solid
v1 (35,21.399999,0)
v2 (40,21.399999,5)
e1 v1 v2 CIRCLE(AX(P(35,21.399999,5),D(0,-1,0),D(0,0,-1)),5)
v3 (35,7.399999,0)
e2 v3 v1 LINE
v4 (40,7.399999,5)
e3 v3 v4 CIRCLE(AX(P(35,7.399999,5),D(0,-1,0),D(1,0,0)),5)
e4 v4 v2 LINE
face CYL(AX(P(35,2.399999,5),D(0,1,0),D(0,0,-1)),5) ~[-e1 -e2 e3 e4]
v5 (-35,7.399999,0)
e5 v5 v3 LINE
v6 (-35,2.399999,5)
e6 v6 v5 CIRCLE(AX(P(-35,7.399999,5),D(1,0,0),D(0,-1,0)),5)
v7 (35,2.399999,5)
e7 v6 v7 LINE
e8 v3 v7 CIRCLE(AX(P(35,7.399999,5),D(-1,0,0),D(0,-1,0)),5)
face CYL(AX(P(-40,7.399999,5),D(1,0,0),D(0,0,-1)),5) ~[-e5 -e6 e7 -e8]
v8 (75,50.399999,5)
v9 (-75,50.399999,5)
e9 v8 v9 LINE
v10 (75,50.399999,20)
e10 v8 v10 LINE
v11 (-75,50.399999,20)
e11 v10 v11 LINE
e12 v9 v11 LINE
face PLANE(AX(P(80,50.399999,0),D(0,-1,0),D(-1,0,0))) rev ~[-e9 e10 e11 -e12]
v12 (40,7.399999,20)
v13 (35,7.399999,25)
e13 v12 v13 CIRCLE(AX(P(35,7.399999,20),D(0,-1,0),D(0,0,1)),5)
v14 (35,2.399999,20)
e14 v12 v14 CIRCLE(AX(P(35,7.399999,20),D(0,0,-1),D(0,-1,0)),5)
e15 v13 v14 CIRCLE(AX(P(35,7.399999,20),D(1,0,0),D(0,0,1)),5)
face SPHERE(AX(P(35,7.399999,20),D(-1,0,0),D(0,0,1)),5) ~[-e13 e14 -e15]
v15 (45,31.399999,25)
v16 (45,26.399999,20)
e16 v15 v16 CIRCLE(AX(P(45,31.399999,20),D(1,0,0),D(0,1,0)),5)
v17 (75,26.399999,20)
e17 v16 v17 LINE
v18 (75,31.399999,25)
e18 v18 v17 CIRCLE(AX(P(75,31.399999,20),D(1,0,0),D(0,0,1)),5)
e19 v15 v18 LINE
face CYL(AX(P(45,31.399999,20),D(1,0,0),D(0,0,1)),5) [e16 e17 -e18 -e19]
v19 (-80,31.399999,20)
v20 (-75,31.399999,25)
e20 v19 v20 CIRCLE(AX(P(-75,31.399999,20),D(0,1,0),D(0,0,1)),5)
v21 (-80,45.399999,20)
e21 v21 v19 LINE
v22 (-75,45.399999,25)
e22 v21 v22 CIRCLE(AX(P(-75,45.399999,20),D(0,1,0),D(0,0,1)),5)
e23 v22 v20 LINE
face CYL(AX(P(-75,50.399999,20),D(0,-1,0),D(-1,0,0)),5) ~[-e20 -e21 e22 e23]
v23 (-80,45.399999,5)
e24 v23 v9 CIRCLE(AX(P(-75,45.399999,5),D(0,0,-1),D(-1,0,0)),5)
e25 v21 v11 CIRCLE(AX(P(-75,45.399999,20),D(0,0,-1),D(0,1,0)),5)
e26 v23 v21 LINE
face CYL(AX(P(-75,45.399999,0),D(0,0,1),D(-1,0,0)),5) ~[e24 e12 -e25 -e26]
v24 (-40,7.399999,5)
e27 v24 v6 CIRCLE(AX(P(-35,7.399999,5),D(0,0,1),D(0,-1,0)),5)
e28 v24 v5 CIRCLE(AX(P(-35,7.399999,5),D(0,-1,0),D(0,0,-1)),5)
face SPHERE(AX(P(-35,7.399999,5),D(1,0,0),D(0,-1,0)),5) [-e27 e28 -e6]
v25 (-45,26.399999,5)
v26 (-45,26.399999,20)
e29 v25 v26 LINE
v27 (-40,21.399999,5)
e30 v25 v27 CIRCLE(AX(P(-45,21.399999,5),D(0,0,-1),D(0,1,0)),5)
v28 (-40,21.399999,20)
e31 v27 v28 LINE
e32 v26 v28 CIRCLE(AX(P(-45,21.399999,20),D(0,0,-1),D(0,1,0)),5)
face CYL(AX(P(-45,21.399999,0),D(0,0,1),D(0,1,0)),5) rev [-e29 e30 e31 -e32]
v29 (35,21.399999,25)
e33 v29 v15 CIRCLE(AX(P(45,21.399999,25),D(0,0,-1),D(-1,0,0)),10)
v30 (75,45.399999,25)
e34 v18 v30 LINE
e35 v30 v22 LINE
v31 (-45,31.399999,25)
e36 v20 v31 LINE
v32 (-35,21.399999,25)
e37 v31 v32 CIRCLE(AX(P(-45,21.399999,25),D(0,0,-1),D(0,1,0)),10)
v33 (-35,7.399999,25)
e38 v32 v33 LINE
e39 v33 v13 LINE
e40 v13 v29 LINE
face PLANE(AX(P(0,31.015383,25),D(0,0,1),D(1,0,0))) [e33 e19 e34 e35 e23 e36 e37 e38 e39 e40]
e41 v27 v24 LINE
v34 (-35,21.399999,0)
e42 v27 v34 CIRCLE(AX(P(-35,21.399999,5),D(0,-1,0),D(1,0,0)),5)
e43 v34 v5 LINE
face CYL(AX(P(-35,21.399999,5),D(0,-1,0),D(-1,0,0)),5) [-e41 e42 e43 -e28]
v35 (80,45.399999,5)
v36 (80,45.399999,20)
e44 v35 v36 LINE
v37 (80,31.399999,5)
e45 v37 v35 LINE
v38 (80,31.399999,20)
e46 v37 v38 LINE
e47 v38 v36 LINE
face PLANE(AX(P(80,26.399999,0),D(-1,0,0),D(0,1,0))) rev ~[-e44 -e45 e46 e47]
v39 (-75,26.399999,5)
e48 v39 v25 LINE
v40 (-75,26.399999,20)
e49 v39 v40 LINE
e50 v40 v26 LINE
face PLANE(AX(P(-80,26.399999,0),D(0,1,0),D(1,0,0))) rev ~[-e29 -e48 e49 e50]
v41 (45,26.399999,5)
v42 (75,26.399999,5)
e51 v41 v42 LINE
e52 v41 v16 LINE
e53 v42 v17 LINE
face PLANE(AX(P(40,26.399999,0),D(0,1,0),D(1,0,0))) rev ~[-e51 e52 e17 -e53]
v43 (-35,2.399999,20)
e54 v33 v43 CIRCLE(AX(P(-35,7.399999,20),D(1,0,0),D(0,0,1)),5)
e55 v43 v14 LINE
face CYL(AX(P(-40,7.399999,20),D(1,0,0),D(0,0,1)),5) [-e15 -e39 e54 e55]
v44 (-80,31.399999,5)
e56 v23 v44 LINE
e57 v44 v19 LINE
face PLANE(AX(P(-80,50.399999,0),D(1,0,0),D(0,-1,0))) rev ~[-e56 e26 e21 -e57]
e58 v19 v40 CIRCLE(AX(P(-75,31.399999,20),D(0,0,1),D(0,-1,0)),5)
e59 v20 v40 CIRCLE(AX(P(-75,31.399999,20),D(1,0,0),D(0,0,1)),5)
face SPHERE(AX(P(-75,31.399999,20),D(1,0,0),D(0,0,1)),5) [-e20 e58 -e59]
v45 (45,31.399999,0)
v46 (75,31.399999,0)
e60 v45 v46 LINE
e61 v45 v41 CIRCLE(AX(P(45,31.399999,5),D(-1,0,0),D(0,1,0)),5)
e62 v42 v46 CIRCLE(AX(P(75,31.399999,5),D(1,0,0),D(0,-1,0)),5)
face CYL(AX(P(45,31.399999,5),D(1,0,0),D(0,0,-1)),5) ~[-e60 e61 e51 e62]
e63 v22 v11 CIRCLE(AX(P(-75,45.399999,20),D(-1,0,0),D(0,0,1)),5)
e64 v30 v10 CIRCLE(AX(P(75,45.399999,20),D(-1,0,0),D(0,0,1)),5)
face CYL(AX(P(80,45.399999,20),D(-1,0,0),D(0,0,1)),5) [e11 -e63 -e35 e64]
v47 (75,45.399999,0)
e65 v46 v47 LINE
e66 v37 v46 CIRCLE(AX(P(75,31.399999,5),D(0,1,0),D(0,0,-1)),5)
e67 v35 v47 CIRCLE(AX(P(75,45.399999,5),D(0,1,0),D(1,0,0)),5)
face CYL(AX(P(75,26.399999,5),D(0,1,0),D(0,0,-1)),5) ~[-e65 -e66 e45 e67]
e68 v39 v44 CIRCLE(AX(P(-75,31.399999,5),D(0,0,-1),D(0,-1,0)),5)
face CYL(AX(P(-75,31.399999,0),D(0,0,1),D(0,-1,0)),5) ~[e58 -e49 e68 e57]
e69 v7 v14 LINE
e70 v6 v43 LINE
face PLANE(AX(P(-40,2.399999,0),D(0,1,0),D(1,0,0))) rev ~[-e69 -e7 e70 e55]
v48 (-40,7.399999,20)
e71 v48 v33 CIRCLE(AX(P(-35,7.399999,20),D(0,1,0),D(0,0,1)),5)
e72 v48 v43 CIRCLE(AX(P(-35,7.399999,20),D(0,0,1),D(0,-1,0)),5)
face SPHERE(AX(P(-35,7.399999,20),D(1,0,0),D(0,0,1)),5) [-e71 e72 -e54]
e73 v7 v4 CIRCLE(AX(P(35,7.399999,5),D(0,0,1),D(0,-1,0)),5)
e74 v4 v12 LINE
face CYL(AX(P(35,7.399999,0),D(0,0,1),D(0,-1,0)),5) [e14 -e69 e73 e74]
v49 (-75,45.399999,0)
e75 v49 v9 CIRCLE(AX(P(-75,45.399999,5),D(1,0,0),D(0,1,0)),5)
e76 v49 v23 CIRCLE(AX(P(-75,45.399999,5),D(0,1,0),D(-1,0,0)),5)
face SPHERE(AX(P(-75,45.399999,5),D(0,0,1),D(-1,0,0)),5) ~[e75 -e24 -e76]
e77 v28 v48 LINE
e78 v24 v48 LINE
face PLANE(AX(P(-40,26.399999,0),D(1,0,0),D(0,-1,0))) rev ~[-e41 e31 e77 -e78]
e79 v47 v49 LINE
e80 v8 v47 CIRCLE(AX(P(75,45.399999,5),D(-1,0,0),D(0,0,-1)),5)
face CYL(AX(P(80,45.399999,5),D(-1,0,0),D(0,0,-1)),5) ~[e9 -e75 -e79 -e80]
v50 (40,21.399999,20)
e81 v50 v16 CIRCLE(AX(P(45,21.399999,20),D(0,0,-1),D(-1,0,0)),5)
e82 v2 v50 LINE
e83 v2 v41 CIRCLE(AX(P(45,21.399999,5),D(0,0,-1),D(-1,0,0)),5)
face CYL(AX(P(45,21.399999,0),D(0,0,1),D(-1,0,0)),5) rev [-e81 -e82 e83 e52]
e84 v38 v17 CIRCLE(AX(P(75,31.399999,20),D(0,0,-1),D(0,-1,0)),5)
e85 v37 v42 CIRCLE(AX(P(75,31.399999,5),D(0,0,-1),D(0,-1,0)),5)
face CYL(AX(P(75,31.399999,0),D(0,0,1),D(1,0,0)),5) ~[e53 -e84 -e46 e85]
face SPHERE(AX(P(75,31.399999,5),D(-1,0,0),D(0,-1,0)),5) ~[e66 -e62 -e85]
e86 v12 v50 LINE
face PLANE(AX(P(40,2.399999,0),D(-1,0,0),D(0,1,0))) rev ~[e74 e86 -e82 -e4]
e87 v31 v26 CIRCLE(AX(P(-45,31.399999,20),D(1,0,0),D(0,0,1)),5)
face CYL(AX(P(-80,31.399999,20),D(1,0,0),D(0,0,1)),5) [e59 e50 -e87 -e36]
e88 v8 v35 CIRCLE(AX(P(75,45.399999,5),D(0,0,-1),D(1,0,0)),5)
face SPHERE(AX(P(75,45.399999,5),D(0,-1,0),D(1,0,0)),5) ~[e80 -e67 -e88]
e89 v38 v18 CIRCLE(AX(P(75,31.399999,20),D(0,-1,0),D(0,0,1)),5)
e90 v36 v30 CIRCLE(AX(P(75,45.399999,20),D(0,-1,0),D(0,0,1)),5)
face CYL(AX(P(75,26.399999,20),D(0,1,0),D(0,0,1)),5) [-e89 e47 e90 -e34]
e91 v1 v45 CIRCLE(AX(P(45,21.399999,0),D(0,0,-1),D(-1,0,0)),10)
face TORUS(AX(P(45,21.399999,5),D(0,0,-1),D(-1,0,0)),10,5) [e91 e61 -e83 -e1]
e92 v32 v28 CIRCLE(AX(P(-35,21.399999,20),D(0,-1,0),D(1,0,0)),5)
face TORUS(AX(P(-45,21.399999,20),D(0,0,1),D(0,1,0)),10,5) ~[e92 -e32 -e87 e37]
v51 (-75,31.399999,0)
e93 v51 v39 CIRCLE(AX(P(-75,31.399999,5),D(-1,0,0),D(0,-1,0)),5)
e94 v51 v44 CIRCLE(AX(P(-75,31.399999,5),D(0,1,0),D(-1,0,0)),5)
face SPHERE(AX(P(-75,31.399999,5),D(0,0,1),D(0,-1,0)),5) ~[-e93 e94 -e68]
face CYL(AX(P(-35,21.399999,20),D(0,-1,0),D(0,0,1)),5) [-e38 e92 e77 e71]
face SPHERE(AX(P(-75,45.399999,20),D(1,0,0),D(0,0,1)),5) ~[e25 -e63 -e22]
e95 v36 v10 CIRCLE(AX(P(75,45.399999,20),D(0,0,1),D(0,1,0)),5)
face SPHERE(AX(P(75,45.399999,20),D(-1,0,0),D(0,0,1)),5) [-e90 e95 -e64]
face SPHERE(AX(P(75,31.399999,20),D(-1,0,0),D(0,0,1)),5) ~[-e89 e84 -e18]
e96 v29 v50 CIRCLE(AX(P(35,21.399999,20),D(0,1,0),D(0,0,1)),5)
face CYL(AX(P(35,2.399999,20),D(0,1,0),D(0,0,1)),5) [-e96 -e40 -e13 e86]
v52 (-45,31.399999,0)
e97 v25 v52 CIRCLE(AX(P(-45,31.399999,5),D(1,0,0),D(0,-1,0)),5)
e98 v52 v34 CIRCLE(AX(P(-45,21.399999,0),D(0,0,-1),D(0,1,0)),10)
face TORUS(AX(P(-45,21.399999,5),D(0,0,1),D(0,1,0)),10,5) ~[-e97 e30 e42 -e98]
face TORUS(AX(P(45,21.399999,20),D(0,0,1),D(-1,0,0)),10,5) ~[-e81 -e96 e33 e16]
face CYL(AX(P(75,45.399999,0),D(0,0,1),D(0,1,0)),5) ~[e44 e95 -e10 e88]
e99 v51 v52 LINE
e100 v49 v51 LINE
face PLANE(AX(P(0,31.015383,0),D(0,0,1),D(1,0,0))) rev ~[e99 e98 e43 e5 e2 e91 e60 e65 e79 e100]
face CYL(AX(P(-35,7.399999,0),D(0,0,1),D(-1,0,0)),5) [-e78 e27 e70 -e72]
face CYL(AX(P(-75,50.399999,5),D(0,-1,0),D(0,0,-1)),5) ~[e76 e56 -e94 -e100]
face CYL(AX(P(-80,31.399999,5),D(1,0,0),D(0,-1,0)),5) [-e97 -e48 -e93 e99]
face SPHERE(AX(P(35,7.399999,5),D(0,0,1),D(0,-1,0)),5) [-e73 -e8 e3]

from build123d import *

# Parameters (mm, degrees)
F1_DEPTH = 25
F2_F1_R  = 5
F2_F2_R  = 5


with BuildPart() as f1:
    # F0 (on Top) → F1 (new body)
    with BuildSketch(Plane.XY):
        Polygon((0, 50.3999988563), (-80, 50.3999988563), (-80, 26.3999988563), (-40, 26.3999988563), (-40, 2.3999988563), (40, 2.3999988563), (40, 26.3999988563), (80, 26.3999988563), (80, 50.3999988563), align=None)
    extrude(amount=F1_DEPTH)

    # F2: fillet of radius 5 on 23 edges, made by hand

    # F2_f1
    f2_f1_edges = [f1.edges().sort_by_distance(p)[0] for p in [
        (40, 26.3999988563, 12.5),
        (-40, 26.3999988563, 12.5),
    ]]
    fillet(f2_f1_edges, radius=F2_F1_R)

    # F2_f2
    f2_f2_edges = [f1.edges().sort_by_distance(p)[0] for p in [
        (0, 2.3999988563, 25),
        (-40, 11.8999988563, 25),
        (0, 50.3999988563, 25),
        (-80, 38.3999988563, 25),
        (-62.5, 26.3999988563, 25),
        (40, 11.8999988563, 25),
        (62.5, 26.3999988563, 25),
        (80, 38.3999988563, 25),
        (40, 2.3999988563, 12.5),
        (0, 2.3999988563, 0),
        (40, 11.8999988563, 0),
        (62.5, 26.3999988563, 0),
        (80, 26.3999988563, 12.5),
        (80, 38.3999988563, 0),
        (80, 50.3999988563, 12.5),
        (-40, 2.3999988563, 12.5),
        (-80, 26.3999988563, 12.5),
        (-62.5, 26.3999988563, 0),
        (-80, 50.3999988563, 12.5),
        (-80, 38.3999988563, 0),
        (0, 50.3999988563, 0),
        (-41.4644660941, 24.9355327622, 0),
        (41.4644660941, 24.9355327622, 0),
        (41.4644660941, 24.9355327622, 25),
        (-41.4644660941, 24.9355327622, 25),
    ]]
    fillet(f2_f2_edges, radius=F2_F2_R)


solid = f1.part
